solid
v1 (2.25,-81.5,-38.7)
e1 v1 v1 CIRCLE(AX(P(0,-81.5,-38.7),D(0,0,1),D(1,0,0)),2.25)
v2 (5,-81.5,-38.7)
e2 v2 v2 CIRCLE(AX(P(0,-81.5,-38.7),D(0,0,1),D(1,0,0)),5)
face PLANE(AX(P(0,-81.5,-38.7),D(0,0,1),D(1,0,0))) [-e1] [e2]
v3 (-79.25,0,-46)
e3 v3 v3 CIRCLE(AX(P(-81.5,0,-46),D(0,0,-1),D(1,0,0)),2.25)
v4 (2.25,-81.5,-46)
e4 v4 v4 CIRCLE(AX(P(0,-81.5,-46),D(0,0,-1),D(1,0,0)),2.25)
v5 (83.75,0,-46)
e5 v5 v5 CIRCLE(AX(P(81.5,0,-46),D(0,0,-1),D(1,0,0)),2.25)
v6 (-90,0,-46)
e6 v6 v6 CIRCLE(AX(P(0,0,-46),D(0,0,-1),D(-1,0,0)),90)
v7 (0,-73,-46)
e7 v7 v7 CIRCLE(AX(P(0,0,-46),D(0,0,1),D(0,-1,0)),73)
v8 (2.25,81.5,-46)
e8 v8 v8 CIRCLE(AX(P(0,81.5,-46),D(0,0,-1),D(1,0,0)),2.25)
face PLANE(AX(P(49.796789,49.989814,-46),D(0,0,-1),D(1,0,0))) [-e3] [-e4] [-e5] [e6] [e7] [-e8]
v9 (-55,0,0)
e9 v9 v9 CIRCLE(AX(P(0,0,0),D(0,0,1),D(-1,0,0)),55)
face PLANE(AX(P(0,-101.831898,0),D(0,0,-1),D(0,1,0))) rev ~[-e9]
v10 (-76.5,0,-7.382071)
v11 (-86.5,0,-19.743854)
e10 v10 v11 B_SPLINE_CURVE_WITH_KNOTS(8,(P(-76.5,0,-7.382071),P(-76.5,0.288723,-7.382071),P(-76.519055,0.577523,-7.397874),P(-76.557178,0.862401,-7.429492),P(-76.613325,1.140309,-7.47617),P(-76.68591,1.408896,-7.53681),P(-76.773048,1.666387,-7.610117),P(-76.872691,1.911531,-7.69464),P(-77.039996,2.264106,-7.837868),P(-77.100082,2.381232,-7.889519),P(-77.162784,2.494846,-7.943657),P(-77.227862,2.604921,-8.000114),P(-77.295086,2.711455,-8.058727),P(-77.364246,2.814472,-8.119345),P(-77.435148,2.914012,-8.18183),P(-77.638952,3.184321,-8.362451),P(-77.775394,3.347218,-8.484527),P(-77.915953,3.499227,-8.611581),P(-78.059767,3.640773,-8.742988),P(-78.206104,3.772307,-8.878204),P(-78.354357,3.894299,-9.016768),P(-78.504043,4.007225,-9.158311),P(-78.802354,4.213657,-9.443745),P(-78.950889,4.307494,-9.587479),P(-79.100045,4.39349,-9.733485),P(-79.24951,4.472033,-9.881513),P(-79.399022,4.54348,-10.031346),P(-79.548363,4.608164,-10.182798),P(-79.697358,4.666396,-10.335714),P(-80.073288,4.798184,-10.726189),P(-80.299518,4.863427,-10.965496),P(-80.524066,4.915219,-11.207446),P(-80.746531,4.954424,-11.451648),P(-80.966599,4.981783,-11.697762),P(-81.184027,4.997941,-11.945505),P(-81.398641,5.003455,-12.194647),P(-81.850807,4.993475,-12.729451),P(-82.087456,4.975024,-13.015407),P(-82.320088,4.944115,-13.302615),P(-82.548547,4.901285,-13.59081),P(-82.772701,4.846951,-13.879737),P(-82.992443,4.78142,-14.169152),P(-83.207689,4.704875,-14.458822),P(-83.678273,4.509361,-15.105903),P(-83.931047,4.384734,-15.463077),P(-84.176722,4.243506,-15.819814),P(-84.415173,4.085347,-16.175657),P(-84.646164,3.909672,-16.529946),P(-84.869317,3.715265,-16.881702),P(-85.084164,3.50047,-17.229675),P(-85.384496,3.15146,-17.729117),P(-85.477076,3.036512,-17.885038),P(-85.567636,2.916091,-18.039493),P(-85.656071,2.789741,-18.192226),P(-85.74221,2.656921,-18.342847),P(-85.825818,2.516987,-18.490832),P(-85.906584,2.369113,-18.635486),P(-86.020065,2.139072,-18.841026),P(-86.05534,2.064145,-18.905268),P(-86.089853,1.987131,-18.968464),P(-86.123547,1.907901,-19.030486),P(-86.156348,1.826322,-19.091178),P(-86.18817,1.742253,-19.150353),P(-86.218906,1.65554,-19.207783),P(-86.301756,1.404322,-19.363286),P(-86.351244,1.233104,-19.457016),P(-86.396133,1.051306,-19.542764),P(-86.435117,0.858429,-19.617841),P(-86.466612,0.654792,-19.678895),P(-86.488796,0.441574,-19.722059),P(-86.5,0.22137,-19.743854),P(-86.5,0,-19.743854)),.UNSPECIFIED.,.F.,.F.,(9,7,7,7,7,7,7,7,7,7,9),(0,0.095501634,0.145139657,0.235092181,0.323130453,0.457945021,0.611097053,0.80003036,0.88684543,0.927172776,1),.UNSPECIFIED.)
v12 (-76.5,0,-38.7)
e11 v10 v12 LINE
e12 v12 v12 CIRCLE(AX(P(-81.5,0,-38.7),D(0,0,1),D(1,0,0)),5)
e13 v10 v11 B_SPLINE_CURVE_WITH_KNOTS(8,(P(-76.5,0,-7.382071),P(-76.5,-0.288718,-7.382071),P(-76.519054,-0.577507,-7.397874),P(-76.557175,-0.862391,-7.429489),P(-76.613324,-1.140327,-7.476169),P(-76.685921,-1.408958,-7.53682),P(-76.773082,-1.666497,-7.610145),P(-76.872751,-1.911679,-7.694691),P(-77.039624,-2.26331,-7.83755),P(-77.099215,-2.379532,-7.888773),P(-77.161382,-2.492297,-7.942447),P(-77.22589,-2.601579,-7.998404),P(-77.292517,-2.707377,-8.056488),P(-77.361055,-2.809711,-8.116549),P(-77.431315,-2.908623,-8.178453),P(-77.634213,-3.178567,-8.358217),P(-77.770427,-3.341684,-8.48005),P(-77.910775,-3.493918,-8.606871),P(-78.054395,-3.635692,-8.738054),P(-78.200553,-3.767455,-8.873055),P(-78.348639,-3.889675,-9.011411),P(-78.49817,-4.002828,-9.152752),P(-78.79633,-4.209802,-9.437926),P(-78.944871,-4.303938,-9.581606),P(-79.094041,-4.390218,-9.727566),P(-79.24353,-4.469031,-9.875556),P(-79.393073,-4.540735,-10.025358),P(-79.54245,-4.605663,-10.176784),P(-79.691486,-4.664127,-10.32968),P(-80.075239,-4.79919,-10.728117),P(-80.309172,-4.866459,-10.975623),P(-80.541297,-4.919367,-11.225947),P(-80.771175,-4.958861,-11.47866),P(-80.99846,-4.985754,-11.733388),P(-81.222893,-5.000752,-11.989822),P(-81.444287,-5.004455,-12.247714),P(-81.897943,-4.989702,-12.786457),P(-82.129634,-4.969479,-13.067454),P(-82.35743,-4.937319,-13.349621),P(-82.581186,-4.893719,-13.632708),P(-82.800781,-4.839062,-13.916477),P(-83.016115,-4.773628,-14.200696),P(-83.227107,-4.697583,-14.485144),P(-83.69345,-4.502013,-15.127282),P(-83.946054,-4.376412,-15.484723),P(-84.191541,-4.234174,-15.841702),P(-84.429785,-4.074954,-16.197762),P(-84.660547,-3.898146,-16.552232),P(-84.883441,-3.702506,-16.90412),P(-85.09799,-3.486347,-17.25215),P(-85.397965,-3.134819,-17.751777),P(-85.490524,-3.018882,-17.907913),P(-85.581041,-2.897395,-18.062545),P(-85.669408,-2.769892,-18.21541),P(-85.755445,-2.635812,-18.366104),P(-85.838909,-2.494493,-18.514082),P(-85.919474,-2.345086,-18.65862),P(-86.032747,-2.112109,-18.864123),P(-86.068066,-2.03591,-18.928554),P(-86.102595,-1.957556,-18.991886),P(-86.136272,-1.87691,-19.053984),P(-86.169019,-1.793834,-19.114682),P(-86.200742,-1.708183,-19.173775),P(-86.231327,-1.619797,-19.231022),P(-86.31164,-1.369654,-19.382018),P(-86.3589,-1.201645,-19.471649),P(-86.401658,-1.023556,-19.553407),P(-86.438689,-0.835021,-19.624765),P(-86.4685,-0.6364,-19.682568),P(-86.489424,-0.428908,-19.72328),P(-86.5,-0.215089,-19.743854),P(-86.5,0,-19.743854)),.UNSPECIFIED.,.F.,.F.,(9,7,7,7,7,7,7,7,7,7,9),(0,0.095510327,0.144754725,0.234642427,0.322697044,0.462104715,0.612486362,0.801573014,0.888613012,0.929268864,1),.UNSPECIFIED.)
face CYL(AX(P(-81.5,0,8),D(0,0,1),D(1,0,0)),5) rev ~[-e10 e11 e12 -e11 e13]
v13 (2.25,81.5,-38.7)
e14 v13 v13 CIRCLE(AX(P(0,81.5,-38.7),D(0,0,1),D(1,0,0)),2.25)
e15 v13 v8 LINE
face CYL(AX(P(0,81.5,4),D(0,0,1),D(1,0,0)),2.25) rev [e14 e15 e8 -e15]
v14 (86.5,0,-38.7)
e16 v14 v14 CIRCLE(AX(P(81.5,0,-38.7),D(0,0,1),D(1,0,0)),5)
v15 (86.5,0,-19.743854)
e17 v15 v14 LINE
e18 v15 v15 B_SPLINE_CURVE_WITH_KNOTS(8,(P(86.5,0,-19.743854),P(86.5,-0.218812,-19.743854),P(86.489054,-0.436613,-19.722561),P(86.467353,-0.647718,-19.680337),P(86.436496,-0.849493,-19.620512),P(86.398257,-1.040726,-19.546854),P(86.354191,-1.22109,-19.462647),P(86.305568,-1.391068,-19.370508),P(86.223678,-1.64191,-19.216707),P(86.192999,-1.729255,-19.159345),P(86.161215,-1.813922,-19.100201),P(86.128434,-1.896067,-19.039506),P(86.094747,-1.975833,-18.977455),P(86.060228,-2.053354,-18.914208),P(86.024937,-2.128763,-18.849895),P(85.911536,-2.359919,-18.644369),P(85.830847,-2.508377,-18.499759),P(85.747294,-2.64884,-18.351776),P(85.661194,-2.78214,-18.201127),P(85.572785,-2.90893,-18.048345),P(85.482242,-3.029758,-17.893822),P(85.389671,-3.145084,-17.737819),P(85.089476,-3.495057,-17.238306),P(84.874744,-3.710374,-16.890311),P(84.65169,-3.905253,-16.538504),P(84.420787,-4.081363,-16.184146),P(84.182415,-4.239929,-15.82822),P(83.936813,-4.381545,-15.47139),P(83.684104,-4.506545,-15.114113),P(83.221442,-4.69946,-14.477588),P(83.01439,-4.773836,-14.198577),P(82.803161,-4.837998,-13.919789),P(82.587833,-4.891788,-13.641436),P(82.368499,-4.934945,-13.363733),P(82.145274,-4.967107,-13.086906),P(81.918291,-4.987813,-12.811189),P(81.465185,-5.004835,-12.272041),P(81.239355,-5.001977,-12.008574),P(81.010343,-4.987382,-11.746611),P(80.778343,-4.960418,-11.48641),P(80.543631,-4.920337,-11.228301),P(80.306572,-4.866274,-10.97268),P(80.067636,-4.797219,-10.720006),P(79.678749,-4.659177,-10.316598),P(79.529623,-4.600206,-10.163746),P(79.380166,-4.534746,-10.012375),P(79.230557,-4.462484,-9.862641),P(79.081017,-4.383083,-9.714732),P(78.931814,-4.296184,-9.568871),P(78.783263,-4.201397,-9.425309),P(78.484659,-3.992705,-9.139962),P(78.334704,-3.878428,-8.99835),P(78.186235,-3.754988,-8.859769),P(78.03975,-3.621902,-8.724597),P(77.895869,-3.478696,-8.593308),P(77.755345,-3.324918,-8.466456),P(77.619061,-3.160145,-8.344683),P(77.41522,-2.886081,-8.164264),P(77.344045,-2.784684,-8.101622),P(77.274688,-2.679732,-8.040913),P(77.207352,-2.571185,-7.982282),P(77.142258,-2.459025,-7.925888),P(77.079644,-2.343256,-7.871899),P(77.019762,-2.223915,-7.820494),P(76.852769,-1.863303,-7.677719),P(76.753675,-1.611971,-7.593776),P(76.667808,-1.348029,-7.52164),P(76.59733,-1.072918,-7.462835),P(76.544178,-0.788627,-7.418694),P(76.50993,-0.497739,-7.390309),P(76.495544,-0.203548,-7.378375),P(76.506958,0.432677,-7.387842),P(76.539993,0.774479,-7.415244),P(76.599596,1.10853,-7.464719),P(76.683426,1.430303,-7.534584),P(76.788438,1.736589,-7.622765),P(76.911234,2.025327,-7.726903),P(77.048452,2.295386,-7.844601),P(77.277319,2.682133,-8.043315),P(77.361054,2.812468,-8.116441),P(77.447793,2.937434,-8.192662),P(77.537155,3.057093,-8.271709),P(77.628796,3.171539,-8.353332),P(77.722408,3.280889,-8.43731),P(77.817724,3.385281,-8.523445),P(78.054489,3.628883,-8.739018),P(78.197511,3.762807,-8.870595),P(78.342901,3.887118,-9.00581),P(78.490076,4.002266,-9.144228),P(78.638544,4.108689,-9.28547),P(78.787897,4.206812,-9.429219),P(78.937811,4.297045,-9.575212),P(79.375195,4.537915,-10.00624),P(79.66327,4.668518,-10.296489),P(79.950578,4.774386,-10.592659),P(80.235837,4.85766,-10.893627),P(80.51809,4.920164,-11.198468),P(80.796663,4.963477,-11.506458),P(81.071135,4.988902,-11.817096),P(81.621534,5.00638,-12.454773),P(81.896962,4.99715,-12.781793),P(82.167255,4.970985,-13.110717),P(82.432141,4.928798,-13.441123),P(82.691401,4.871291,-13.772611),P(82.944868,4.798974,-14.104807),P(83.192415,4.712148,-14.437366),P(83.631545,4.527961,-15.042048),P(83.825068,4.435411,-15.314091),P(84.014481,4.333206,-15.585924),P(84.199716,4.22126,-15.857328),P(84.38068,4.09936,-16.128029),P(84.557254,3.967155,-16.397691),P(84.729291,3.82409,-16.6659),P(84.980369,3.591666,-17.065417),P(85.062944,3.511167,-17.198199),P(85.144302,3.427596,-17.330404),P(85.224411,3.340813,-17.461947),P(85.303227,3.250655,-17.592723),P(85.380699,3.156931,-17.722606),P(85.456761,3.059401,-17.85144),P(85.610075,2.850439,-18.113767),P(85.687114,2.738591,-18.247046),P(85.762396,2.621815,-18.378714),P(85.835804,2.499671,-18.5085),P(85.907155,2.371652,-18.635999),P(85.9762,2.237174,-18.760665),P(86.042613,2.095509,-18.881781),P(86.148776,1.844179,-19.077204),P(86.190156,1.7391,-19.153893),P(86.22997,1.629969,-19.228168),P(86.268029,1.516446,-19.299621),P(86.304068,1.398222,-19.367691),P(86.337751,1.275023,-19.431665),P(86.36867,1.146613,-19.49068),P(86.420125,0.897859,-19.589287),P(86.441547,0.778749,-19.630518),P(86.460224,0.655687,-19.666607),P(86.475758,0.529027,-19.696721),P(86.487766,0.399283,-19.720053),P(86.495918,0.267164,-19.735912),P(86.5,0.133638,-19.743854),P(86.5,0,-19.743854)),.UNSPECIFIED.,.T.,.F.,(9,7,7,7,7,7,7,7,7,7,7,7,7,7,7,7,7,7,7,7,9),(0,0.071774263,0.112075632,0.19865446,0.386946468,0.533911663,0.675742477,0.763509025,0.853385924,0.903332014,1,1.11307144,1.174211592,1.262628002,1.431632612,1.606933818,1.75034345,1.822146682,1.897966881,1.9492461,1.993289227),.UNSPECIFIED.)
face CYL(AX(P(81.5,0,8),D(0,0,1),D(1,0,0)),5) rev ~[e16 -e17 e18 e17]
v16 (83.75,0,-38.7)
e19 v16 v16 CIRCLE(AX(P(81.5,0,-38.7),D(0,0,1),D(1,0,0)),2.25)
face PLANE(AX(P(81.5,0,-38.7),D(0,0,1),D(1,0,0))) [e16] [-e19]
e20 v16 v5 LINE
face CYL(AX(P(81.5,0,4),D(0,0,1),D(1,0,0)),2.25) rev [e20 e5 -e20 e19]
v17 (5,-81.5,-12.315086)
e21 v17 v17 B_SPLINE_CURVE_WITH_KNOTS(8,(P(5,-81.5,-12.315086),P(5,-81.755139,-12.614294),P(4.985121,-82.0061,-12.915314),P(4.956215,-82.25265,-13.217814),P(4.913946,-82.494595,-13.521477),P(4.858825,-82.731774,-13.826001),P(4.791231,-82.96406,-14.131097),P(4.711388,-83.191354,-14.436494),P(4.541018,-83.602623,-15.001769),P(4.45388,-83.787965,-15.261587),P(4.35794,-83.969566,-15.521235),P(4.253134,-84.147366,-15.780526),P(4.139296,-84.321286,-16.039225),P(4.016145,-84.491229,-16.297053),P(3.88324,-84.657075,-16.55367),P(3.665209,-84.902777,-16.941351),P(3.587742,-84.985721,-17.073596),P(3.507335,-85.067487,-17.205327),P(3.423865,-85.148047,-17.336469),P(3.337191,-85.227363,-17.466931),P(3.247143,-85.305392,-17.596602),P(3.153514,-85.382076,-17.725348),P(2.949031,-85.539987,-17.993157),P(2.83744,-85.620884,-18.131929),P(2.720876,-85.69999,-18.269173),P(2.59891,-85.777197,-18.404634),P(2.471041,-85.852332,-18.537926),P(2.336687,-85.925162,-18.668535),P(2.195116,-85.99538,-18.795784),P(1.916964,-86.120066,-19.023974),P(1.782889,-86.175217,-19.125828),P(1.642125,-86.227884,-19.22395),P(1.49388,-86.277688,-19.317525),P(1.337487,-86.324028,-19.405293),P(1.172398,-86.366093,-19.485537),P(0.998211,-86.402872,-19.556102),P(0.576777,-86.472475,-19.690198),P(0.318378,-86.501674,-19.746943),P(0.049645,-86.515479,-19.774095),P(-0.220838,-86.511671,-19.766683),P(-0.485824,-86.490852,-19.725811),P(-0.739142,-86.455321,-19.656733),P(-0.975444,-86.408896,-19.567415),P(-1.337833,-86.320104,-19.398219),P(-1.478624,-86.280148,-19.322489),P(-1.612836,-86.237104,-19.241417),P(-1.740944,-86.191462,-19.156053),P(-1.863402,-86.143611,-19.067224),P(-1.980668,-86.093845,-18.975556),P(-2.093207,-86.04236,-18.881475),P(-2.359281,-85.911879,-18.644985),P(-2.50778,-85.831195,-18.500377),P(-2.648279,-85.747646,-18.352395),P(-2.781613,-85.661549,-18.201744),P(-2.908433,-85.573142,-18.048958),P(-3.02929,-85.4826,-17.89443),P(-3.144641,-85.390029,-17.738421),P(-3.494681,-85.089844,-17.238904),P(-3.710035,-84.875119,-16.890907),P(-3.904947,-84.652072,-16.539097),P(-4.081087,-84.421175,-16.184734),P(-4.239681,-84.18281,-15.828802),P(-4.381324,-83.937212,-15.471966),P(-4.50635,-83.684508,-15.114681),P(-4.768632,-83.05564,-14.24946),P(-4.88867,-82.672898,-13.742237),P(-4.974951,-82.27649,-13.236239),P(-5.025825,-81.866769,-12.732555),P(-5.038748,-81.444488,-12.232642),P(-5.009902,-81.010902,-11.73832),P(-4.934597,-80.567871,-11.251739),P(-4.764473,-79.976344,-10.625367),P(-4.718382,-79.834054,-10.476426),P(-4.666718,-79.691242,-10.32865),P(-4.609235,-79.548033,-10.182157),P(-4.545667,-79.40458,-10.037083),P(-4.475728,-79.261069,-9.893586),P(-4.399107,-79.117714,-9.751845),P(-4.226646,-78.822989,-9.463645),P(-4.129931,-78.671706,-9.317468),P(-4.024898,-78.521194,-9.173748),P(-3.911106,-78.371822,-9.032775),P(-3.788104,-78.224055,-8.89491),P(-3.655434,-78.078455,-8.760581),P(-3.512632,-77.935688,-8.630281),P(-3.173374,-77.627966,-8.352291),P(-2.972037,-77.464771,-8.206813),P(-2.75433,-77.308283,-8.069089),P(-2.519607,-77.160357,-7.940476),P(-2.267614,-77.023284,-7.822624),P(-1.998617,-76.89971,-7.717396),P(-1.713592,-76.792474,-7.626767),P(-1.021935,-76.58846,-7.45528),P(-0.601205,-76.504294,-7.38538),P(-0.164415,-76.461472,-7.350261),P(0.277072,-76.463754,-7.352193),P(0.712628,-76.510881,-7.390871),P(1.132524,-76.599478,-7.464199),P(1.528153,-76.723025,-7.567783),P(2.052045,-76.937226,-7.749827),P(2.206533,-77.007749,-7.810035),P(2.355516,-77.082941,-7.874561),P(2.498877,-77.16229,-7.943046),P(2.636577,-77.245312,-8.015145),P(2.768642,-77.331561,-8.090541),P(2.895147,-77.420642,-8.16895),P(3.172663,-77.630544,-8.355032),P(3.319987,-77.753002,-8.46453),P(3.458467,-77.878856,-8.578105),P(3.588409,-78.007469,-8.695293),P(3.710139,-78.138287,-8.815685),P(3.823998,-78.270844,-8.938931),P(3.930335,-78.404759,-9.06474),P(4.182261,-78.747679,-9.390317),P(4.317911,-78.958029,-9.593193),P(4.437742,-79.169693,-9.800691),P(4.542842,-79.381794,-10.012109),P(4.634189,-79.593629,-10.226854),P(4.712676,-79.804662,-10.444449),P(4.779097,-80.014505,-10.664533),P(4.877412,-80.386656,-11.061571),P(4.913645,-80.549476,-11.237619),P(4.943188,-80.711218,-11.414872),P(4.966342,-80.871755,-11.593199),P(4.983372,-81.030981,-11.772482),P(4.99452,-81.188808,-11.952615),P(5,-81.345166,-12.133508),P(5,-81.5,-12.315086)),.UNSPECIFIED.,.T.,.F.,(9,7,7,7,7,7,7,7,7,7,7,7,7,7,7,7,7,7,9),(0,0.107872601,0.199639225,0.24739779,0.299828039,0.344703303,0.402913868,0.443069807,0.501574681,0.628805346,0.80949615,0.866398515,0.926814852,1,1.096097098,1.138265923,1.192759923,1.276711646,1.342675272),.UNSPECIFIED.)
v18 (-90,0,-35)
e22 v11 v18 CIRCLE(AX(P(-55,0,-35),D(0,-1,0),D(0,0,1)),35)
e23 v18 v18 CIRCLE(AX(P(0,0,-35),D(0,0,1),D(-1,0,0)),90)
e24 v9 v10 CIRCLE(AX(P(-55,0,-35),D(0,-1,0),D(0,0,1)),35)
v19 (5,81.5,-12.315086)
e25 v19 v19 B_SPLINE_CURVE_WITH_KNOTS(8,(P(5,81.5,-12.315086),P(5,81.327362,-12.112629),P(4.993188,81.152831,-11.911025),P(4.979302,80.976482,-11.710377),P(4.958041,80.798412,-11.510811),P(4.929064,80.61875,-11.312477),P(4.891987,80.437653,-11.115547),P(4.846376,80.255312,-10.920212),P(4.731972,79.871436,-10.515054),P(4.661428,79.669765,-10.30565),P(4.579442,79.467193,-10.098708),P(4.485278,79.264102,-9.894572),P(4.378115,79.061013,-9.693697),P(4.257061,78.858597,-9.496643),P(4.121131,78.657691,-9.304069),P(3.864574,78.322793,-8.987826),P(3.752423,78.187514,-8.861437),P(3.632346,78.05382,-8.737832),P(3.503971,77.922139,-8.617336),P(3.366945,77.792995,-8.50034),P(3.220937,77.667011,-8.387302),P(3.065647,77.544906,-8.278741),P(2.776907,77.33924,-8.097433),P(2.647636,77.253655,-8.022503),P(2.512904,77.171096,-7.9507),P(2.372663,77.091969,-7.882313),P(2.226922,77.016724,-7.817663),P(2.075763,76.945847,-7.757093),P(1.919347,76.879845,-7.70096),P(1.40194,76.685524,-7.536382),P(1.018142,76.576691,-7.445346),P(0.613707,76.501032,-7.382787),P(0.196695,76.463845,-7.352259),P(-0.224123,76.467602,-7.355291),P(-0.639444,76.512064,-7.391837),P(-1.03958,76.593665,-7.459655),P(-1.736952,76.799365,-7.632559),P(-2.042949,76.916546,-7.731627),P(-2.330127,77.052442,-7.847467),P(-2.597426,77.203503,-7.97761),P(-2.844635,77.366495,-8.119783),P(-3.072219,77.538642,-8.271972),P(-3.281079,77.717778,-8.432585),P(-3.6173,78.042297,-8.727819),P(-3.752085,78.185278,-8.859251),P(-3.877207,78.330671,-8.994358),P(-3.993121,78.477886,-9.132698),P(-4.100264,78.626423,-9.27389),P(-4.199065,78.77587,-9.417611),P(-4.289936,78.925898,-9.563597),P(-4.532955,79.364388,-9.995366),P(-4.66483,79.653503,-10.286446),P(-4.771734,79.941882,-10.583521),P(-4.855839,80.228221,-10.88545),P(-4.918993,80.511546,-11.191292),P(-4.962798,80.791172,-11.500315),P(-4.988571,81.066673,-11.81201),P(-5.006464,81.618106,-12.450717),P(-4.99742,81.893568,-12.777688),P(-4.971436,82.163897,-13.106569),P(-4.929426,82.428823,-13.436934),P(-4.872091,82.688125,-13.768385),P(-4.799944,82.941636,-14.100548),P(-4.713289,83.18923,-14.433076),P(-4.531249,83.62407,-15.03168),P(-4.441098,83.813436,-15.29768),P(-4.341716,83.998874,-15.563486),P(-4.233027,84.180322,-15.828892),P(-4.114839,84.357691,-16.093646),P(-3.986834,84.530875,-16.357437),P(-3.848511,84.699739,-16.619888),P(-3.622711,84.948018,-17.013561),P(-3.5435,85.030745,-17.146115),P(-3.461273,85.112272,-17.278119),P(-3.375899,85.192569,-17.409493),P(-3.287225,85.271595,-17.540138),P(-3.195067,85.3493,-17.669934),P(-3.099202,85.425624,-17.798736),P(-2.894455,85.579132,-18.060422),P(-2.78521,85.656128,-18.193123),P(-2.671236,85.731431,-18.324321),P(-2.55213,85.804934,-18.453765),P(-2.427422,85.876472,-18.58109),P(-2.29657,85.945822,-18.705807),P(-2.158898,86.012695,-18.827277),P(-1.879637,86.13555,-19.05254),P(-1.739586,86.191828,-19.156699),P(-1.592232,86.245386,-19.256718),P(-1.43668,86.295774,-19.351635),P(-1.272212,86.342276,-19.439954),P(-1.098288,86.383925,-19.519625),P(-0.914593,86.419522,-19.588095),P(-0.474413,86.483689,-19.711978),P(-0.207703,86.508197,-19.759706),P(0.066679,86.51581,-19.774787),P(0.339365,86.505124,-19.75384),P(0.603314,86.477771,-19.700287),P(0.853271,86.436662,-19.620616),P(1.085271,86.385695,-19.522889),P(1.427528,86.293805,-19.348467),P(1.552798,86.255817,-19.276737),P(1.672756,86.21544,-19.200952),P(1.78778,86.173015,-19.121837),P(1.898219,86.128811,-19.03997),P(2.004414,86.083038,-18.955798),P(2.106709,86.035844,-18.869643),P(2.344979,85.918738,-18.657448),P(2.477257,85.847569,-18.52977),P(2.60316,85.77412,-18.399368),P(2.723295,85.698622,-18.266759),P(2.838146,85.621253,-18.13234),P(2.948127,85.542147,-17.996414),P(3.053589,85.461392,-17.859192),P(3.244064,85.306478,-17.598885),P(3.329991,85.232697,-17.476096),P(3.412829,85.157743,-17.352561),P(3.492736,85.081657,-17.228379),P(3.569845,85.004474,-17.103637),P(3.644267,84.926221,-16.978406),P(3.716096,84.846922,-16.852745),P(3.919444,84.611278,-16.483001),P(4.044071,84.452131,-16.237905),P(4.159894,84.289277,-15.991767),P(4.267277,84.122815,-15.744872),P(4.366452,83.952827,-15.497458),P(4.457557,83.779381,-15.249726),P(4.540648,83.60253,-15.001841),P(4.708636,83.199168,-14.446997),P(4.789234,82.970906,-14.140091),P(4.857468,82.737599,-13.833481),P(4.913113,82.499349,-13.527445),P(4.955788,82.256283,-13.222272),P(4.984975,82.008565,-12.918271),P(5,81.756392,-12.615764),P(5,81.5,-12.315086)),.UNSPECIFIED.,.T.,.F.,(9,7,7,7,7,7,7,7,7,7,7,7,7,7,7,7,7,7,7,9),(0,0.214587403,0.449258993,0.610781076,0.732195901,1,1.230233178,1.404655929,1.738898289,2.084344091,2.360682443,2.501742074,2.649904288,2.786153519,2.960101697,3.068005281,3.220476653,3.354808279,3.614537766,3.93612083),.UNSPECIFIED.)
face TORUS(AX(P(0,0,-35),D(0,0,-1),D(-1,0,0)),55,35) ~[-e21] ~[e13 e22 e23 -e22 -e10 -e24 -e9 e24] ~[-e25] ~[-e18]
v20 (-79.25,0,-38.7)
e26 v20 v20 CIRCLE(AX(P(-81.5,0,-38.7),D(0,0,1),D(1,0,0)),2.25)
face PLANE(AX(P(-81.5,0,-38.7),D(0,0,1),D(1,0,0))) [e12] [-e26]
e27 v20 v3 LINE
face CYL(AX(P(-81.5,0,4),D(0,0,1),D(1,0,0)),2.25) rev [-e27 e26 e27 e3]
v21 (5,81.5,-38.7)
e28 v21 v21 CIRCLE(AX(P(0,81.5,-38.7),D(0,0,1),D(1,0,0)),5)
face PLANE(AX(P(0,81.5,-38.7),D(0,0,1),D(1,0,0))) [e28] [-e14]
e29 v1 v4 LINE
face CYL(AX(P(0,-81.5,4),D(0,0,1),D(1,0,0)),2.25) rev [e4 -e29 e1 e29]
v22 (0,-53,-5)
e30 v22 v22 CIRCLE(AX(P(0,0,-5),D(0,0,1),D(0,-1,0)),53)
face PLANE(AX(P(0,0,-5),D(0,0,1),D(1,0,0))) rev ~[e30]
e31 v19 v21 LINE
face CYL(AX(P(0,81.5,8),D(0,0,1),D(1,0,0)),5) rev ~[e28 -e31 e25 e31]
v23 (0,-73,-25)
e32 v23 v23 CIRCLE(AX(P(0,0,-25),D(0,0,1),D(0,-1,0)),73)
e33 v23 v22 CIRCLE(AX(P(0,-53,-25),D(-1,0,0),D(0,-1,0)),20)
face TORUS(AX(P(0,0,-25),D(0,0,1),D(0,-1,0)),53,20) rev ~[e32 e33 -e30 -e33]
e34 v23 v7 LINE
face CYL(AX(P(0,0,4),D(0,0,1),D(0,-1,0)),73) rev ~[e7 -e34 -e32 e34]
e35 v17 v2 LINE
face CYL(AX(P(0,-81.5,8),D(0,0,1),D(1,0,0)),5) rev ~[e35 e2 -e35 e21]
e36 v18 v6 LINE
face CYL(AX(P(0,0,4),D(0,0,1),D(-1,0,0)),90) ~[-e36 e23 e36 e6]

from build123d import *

# Parameters (mm, degrees)
F0_R      = 61
F0_R_2    = 58
F1_DEPTH  = 4
F2_R      = 61
F2_R_2    = 56
F3_DEPTH  = 3
F4_SIZE   = 1.99999
F5_R      = 2.25
F6_DEPTH  = 7
F7_SIZE   = 3
F8_R      = 76
F8_R_2    = 2.25
F9_DEPTH  = 4
F10_W     = 190.4741451144
F10_H     = 3
F10_H_2   = 4
F11_DEPTH = 100
F12_R     = 2.25
F13_DEPTH = 50
F16_DEPTH = 73
F17_R     = 5
F18_DEPTH = 46.7
F20_DEPTH = 400
F21_R     = 73.5
F22_DEPTH = 5
F24_R     = 20


# Not quite as in the source:
# - a fillet or chamfer that OpenCascade refuses, or shapes differently, is made with other operations: its cross-section is extruded or revolved along the edge and cut away or added
# - a fillet or chamfer is up to 0.001 mm smaller than in the source, because OpenCascade refuses the exact size
# - a feature of the source that left no trace in its solid (it failed there, or was rolled back) is left out
# - a feature names something its author has since deleted; it is built from what else it names


with BuildPart() as f1:
    # F0 (on Top) → F1 (new body)
    with BuildSketch(Plane.XY):
        Circle(F0_R)
        Circle(F0_R_2, mode=Mode.SUBTRACT)
    extrude(amount=F1_DEPTH)

    # F2 (on Top) → F3 (join)
    with BuildSketch(Plane.XY):
        Circle(F2_R)
        Circle(F2_R_2, mode=Mode.SUBTRACT)
    extrude(amount=-F3_DEPTH)

    # F4 (size 2 in the source; OpenCascade refuses exactly that, so slightly less here)
    f4_edges = [f1.edges().sort_by_distance(p)[0] for p in [
        (-56, 0, 0),
    ]]
    chamfer(f4_edges, length=F4_SIZE)

    # F5 (on face) → F6 (join)
    with BuildSketch(Plane(origin=(0, 0, -3), x_dir=(1, 0, 0), z_dir=(0, 0, -1))):
        with BuildLine():
            ThreePointArc((-53.9524024645, 46.1781799693), (-46.4524024645, 38.6781799693), (-38.9524024645, 46.1781799693))
            ThreePointArc((-38.9524024645, 46.1781799693), (-41.1922562627, 51.5242871452), (-46.5739656475, 53.6771947308))
            ThreePointArc((-46.5739656475, 53.6771947308), (-51.7985096404, 51.4383261711), (-53.9524024645, 46.1781799693))
        make_face()
        with Locations((-46.4524024645, 46.1781799693)):
            Circle(F5_R, mode=Mode.SUBTRACT)
        with BuildLine():
            ThreePointArc((-46.1781799693, -53.9524024645), (-40.8748791104, -51.7557033234), (-38.6781799693, -46.4524024645))
            ThreePointArc((-38.6781799693, -46.4524024645), (-46.2389635571, -38.9526487781), (-53.6771947308, -46.5739656475))
            ThreePointArc((-53.6771947308, -46.5739656475), (-51.4383261711, -51.7985096404), (-46.1781799693, -53.9524024645))
        make_face()
        with Locations((-46.1781799693, -46.4524024645)):
            Circle(F5_R, mode=Mode.SUBTRACT)
        with BuildLine():
            ThreePointArc((46.5739656475, -53.6771947308), (51.7985096404, -51.4383261711), (53.9524024645, -46.1781799693))
            ThreePointArc((53.9524024645, -46.1781799693), (41.1062952885, -40.9180337676), (46.5739656475, -53.6771947308))
        make_face()
        with Locations((46.4524024645, -46.1781799693)):
            Circle(F5_R, mode=Mode.SUBTRACT)
        with BuildLine():
            ThreePointArc((46.1781799693, 53.9524024645), (40.8748791104, 41.1491016056), (53.6781799693, 46.4524024645))
            ThreePointArc((53.6781799693, 46.4524024645), (53.6779336557, 46.5131860522), (53.6771947308, 46.5739656475))
            ThreePointArc((53.6771947308, 46.5739656475), (51.4383261711, 51.7985096404), (46.1781799693, 53.9524024645))
        make_face()
        with Locations((46.1781799693, 46.4524024645)):
            Circle(F5_R, mode=Mode.SUBTRACT)
        with BuildLine():
            ThreePointArc((-47.1436914684, 38.7101066225), (-51.9947245198, 41.1251940961), (-53.9524024645, 46.1781799693))
            Line((-53.9524024645, 46.1781799693), (-53.9524024645, 28.4629279645))
            ThreePointArc((-53.9524024645, 28.4629279645), (-50.8070489178, 33.7586104611), (-47.1436914684, 38.7101066225))
        make_face()
        with BuildLine():
            Line((-28.4269492748, 53.9713679179), (-46.5739656475, 53.6771947308))
            ThreePointArc((-46.5739656475, 53.6771947308), (-41.4610501615, 51.7760726253), (-38.9885529473, 46.9136732635))
            ThreePointArc((-38.9885529473, 46.9136732635), (-33.8919643636, 50.7181895534), (-28.4269492748, 53.9713679179))
        make_face()
        with BuildLine():
            Line((46.1781799693, 53.9524024645), (28.4629279645, 53.9524024645))
            ThreePointArc((28.4629279645, 53.9524024645), (33.7586104611, 50.8070489178), (38.7101066225, 47.1436914684))
            ThreePointArc((38.7101066225, 47.1436914684), (41.1251940961, 51.9947245198), (46.1781799693, 53.9524024645))
        make_face()
        with BuildLine():
            Line((53.9713679179, 28.4269492748), (53.6771947308, 46.5739656475))
            ThreePointArc((53.6771947308, 46.5739656475), (53.6779336557, 46.5131860522), (53.6781799693, 46.4524024645))
            ThreePointArc((53.6781799693, 46.4524024645), (51.7354364735, 41.4158460866), (46.9136732635, 38.9885529473))
            ThreePointArc((46.9136732635, 38.9885529473), (50.7181895534, 33.8919643636), (53.9713679179, 28.4269492748))
        make_face()
        with BuildLine():
            Line((53.9524024645, -46.1781799693), (53.9524024645, -28.4629279645))
            ThreePointArc((53.9524024645, -28.4629279645), (50.8070489178, -33.7586104611), (47.1436914684, -38.7101066225))
            ThreePointArc((47.1436914684, -38.7101066225), (51.9947245198, -41.1251940961), (53.9524024645, -46.1781799693))
        make_face()
        with BuildLine():
            ThreePointArc((38.9885529473, -46.9136732635), (33.8919643636, -50.7181895534), (28.4269492748, -53.9713679179))
            Line((28.4269492748, -53.9713679179), (46.5739656475, -53.6771947308))
            ThreePointArc((46.5739656475, -53.6771947308), (41.4610501615, -51.7760726253), (38.9885529473, -46.9136732635))
        make_face()
        with BuildLine():
            ThreePointArc((-38.7101066225, -47.1436914684), (-41.1251940961, -51.9947245198), (-46.1781799693, -53.9524024645))
            Line((-46.1781799693, -53.9524024645), (-28.4629279645, -53.9524024645))
            ThreePointArc((-28.4629279645, -53.9524024645), (-33.7586104611, -50.8070489178), (-38.7101066225, -47.1436914684))
        make_face()
        with BuildLine():
            ThreePointArc((-46.9136732635, -38.9885529473), (-50.7181895534, -33.8919643636), (-53.9713679179, -28.4269492748))
            Line((-53.9713679179, -28.4269492748), (-53.6771947308, -46.5739656475))
            ThreePointArc((-53.6771947308, -46.5739656475), (-51.7760726253, -41.4610501615), (-46.9136732635, -38.9885529473))
        make_face()
    extrude(amount=-F6_DEPTH)

    # F7
    f7_edges = [f1.edges().sort_by_distance(p)[0] for p in [
        (43.92818, -46.452402, -3),
        (44.202402, 46.17818, -3),
        (-48.42818, 46.452402, -3),
        (-48.702402, -46.17818, -3),
    ]]
    chamfer(f7_edges, length=F7_SIZE)

    # F8 (on face) → F9 (join)
    with BuildSketch(Plane.XY.offset(4)):
        Circle(F8_R)
        with BuildLine():
            ThreePointArc((53.9524024645, 28.4629279645), (60.9999966103, 0.0203356494), (53.9713679179, -28.4269492748))
            Line((53.9713679179, -28.4269492748), (53.6771947308, -46.5739656475))
            ThreePointArc((53.6771947308, -46.5739656475), (51.4383261711, -51.7985096404), (46.1781799693, -53.9524024644))
            Line((46.1781799693, -53.9524024645), (28.4629279645, -53.9524024645))
            ThreePointArc((28.4629279645, -53.9524024645), (0.0203356494, -60.9999966103), (-28.4269492748, -53.9713679179))
            Line((-28.4269492748, -53.9713679179), (-46.5739656475, -53.6771947308))
            ThreePointArc((-46.5739656475, -53.6771947308), (-51.7985096404, -51.4383261711), (-53.9524024645, -46.1781799693))
            Line((-53.9524024645, -46.1781799693), (-53.9524024645, -28.4629279645))
            ThreePointArc((-53.9524024645, -28.4629279645), (-60.9999966103, -0.0203356494), (-53.9713679179, 28.4269492748))
            Line((-53.9713679179, 28.4269492748), (-53.6771947308, 46.5739656475))
            ThreePointArc((-53.6771947308, 46.5739656475), (-51.4383261711, 51.7985096404), (-46.1781799693, 53.9524024645))
            Line((-46.1781799693, 53.9524024645), (-28.4629279645, 53.9524024645))
            ThreePointArc((-28.4629279645, 53.9524024645), (-0.0203356494, 60.9999966103), (28.4269492748, 53.9713679179))
            Line((28.4269492748, 53.9713679179), (46.5739656475, 53.6771947308))
            ThreePointArc((46.5739656475, 53.6771947308), (51.7985096404, 51.4383261711), (53.9524024645, 46.1781799693))
            Line((53.9524024645, 46.1781799693), (53.9524024645, 28.4629279645))
        make_face(mode=Mode.SUBTRACT)
        with Locations((-46.1781799693, 46.4524024645)):
            Circle(F8_R_2)
    extrude(amount=F9_DEPTH)

    # F10 (on Right) → F11 (cut, symmetric)
    with BuildSketch(Plane.YZ):
        with Locations((-5.4310373962, -1.5)):
            Rectangle(F10_W, F10_H)
        with Locations((-5.4310373962, 2)):
            Rectangle(F10_W, F10_H_2)
    extrude(amount=F11_DEPTH, both=True, mode=Mode.SUBTRACT)

    # F12 (on face) → F13 (join)
    with BuildSketch(Plane(origin=(0, 0, 4), x_dir=(1, 0, 0), z_dir=(0, 0, -1))):
        with BuildLine():
            ThreePointArc((90, 0), (81.5, -8.5), (73, 0))
            ThreePointArc((73, 0), (51.6187950614, -51.6187949919), (9.83e-08, -73))
            ThreePointArc((9.83e-08, -73), (6.0104076749, -75.4895923947), (8.5, -81.5))
            ThreePointArc((8.5, -81.5), (6.0104076196, -87.5104076606), (-5.8e-08, -90))
            ThreePointArc((-5.8e-08, -90), (63.6396102863, -63.6396103273), (90, 0))
        make_face()
        with BuildLine():
            ThreePointArc((9.4e-09, 73), (51.6187950299, 51.6187950233), (73, 0))
            ThreePointArc((73, 0), (81.5, 8.5), (90, 0))
            ThreePointArc((90, 0), (63.6396103068, 63.6396103068), (0, 90))
            ThreePointArc((0, 90), (6.0104076401, 87.5104076401), (8.5, 81.5))
            ThreePointArc((8.5, 81.5), (6.0104076434, 75.4895923632), (9.4e-09, 73))
        make_face()
        with BuildLine():
            ThreePointArc((90, 0), (81.5, 8.5), (73, 0))
            ThreePointArc((73, 0), (81.5, -8.5), (90, 0))
        make_face()
        with Locations((81.5, 0)):
            Circle(F12_R, mode=Mode.SUBTRACT)
        with BuildLine():
            ThreePointArc((-73, 0), (-51.6187950233, 51.6187950299), (9.4e-09, 73))
            ThreePointArc((9.4e-09, 73), (-8.5, 81.4999999953), (0, 90))
            ThreePointArc((0, 90), (-63.6396103153, 63.6396102983), (-90, -2.4e-08))
            ThreePointArc((-90, -2.4e-08), (-81.500000012, 8.5), (-73, 0))
        make_face()
        with BuildLine():
            ThreePointArc((0, 90), (-8.5, 81.4999999953), (9.4e-09, 73))
            ThreePointArc((9.4e-09, 73), (6.0104076434, 75.4895923632), (8.5, 81.5))
            ThreePointArc((8.5, 81.5), (6.0104076401, 87.5104076401), (0, 90))
        make_face()
        with Locations((0, 81.5)):
            Circle(F12_R, mode=Mode.SUBTRACT)
        with BuildLine():
            ThreePointArc((-5.8e-08, -90), (-8.5, -81.4999999219), (9.83e-08, -73))
            ThreePointArc((9.83e-08, -73), (-51.6187949919, -51.6187950614), (-73, 0))
            ThreePointArc((-73, 0), (-81.499999988, -8.5), (-90, -2.4e-08))
            ThreePointArc((-90, -2.4e-08), (-63.6396103188, -63.6396102948), (-5.8e-08, -90))
        make_face()
        with BuildLine():
            ThreePointArc((8.5, -81.5), (6.0104076749, -75.4895923947), (9.83e-08, -73))
            ThreePointArc((9.83e-08, -73), (-8.5, -81.4999999219), (-5.8e-08, -90))
            ThreePointArc((-5.8e-08, -90), (6.0104076196, -87.5104076606), (8.5, -81.5))
        make_face()
        with Locations((0, -81.5)):
            Circle(F12_R, mode=Mode.SUBTRACT)
        with BuildLine():
            ThreePointArc((-90, -2.4e-08), (-81.499999988, -8.5), (-73, 0))
            ThreePointArc((-73, 0), (-81.500000012, 8.5), (-90, -2.4e-08))
        make_face()
        with Locations((-81.5, 0)):
            Circle(F12_R, mode=Mode.SUBTRACT)
    extrude(amount=F13_DEPTH)

    # F12 (on face) → F16 (cut)
    with BuildSketch(Plane(origin=(0, 0, 4), x_dir=(1, 0, 0), z_dir=(0, 0, -1))):
        with Locations((-81.5, 0)):
            Circle(F12_R)
        with Locations((0, -81.5)):
            Circle(F12_R)
        with Locations((81.5, 0)):
            Circle(F12_R)
        with Locations((0, 81.5)):
            Circle(F12_R)
    extrude(amount=F16_DEPTH, mode=Mode.SUBTRACT)

    # F17 (on face) → F18 (cut)
    with BuildSketch(Plane.XY.offset(8)):
        with Locations((0, 81.5)):
            Circle(F17_R)
        with Locations((-81.5, 0)):
            Circle(F17_R)
        with Locations((81.5, 0)):
            Circle(F17_R)
        with Locations((0, -81.5)):
            Circle(F17_R)
    extrude(amount=-F18_DEPTH, mode=Mode.SUBTRACT)

    # F19 (on Right) → F20 (cut, symmetric)
    with BuildSketch(Plane.YZ):
        Polygon((-100.4741415381, 25.2155177295), (-101.8318980932, 0), (102.0258665085, 0), (102.0258665085, 25.2155177295), align=None)
    extrude(amount=F20_DEPTH, both=True, mode=Mode.SUBTRACT)

    # F21 (on face) → F22 (join)
    with BuildSketch(Plane.XY):
        Circle(F21_R)
    extrude(amount=-F22_DEPTH)

    # F23: fillet of radius 35 on 1 edges, made by hand

    # F23_s1 → F23_t2 (revolve, cut)
    with BuildSketch(Plane.XZ):
        with BuildLine():
            ThreePointArc((-55, 0), (-79.7487373415, -10.2512626585), (-90, -35))
            Line((-90, -35), (-90, 0))
            Line((-90, 0), (-55, 0))
        make_face()
    revolve(axis=Axis((0, 0, 0), (0, 0, 1)), mode=Mode.SUBTRACT)

    # F24
    f24_edges = [f1.edges().sort_by_distance(p)[0] for p in [
        (73, 0, -5),
    ]]
    fillet(f24_edges, radius=F24_R)


solid = f1.part
